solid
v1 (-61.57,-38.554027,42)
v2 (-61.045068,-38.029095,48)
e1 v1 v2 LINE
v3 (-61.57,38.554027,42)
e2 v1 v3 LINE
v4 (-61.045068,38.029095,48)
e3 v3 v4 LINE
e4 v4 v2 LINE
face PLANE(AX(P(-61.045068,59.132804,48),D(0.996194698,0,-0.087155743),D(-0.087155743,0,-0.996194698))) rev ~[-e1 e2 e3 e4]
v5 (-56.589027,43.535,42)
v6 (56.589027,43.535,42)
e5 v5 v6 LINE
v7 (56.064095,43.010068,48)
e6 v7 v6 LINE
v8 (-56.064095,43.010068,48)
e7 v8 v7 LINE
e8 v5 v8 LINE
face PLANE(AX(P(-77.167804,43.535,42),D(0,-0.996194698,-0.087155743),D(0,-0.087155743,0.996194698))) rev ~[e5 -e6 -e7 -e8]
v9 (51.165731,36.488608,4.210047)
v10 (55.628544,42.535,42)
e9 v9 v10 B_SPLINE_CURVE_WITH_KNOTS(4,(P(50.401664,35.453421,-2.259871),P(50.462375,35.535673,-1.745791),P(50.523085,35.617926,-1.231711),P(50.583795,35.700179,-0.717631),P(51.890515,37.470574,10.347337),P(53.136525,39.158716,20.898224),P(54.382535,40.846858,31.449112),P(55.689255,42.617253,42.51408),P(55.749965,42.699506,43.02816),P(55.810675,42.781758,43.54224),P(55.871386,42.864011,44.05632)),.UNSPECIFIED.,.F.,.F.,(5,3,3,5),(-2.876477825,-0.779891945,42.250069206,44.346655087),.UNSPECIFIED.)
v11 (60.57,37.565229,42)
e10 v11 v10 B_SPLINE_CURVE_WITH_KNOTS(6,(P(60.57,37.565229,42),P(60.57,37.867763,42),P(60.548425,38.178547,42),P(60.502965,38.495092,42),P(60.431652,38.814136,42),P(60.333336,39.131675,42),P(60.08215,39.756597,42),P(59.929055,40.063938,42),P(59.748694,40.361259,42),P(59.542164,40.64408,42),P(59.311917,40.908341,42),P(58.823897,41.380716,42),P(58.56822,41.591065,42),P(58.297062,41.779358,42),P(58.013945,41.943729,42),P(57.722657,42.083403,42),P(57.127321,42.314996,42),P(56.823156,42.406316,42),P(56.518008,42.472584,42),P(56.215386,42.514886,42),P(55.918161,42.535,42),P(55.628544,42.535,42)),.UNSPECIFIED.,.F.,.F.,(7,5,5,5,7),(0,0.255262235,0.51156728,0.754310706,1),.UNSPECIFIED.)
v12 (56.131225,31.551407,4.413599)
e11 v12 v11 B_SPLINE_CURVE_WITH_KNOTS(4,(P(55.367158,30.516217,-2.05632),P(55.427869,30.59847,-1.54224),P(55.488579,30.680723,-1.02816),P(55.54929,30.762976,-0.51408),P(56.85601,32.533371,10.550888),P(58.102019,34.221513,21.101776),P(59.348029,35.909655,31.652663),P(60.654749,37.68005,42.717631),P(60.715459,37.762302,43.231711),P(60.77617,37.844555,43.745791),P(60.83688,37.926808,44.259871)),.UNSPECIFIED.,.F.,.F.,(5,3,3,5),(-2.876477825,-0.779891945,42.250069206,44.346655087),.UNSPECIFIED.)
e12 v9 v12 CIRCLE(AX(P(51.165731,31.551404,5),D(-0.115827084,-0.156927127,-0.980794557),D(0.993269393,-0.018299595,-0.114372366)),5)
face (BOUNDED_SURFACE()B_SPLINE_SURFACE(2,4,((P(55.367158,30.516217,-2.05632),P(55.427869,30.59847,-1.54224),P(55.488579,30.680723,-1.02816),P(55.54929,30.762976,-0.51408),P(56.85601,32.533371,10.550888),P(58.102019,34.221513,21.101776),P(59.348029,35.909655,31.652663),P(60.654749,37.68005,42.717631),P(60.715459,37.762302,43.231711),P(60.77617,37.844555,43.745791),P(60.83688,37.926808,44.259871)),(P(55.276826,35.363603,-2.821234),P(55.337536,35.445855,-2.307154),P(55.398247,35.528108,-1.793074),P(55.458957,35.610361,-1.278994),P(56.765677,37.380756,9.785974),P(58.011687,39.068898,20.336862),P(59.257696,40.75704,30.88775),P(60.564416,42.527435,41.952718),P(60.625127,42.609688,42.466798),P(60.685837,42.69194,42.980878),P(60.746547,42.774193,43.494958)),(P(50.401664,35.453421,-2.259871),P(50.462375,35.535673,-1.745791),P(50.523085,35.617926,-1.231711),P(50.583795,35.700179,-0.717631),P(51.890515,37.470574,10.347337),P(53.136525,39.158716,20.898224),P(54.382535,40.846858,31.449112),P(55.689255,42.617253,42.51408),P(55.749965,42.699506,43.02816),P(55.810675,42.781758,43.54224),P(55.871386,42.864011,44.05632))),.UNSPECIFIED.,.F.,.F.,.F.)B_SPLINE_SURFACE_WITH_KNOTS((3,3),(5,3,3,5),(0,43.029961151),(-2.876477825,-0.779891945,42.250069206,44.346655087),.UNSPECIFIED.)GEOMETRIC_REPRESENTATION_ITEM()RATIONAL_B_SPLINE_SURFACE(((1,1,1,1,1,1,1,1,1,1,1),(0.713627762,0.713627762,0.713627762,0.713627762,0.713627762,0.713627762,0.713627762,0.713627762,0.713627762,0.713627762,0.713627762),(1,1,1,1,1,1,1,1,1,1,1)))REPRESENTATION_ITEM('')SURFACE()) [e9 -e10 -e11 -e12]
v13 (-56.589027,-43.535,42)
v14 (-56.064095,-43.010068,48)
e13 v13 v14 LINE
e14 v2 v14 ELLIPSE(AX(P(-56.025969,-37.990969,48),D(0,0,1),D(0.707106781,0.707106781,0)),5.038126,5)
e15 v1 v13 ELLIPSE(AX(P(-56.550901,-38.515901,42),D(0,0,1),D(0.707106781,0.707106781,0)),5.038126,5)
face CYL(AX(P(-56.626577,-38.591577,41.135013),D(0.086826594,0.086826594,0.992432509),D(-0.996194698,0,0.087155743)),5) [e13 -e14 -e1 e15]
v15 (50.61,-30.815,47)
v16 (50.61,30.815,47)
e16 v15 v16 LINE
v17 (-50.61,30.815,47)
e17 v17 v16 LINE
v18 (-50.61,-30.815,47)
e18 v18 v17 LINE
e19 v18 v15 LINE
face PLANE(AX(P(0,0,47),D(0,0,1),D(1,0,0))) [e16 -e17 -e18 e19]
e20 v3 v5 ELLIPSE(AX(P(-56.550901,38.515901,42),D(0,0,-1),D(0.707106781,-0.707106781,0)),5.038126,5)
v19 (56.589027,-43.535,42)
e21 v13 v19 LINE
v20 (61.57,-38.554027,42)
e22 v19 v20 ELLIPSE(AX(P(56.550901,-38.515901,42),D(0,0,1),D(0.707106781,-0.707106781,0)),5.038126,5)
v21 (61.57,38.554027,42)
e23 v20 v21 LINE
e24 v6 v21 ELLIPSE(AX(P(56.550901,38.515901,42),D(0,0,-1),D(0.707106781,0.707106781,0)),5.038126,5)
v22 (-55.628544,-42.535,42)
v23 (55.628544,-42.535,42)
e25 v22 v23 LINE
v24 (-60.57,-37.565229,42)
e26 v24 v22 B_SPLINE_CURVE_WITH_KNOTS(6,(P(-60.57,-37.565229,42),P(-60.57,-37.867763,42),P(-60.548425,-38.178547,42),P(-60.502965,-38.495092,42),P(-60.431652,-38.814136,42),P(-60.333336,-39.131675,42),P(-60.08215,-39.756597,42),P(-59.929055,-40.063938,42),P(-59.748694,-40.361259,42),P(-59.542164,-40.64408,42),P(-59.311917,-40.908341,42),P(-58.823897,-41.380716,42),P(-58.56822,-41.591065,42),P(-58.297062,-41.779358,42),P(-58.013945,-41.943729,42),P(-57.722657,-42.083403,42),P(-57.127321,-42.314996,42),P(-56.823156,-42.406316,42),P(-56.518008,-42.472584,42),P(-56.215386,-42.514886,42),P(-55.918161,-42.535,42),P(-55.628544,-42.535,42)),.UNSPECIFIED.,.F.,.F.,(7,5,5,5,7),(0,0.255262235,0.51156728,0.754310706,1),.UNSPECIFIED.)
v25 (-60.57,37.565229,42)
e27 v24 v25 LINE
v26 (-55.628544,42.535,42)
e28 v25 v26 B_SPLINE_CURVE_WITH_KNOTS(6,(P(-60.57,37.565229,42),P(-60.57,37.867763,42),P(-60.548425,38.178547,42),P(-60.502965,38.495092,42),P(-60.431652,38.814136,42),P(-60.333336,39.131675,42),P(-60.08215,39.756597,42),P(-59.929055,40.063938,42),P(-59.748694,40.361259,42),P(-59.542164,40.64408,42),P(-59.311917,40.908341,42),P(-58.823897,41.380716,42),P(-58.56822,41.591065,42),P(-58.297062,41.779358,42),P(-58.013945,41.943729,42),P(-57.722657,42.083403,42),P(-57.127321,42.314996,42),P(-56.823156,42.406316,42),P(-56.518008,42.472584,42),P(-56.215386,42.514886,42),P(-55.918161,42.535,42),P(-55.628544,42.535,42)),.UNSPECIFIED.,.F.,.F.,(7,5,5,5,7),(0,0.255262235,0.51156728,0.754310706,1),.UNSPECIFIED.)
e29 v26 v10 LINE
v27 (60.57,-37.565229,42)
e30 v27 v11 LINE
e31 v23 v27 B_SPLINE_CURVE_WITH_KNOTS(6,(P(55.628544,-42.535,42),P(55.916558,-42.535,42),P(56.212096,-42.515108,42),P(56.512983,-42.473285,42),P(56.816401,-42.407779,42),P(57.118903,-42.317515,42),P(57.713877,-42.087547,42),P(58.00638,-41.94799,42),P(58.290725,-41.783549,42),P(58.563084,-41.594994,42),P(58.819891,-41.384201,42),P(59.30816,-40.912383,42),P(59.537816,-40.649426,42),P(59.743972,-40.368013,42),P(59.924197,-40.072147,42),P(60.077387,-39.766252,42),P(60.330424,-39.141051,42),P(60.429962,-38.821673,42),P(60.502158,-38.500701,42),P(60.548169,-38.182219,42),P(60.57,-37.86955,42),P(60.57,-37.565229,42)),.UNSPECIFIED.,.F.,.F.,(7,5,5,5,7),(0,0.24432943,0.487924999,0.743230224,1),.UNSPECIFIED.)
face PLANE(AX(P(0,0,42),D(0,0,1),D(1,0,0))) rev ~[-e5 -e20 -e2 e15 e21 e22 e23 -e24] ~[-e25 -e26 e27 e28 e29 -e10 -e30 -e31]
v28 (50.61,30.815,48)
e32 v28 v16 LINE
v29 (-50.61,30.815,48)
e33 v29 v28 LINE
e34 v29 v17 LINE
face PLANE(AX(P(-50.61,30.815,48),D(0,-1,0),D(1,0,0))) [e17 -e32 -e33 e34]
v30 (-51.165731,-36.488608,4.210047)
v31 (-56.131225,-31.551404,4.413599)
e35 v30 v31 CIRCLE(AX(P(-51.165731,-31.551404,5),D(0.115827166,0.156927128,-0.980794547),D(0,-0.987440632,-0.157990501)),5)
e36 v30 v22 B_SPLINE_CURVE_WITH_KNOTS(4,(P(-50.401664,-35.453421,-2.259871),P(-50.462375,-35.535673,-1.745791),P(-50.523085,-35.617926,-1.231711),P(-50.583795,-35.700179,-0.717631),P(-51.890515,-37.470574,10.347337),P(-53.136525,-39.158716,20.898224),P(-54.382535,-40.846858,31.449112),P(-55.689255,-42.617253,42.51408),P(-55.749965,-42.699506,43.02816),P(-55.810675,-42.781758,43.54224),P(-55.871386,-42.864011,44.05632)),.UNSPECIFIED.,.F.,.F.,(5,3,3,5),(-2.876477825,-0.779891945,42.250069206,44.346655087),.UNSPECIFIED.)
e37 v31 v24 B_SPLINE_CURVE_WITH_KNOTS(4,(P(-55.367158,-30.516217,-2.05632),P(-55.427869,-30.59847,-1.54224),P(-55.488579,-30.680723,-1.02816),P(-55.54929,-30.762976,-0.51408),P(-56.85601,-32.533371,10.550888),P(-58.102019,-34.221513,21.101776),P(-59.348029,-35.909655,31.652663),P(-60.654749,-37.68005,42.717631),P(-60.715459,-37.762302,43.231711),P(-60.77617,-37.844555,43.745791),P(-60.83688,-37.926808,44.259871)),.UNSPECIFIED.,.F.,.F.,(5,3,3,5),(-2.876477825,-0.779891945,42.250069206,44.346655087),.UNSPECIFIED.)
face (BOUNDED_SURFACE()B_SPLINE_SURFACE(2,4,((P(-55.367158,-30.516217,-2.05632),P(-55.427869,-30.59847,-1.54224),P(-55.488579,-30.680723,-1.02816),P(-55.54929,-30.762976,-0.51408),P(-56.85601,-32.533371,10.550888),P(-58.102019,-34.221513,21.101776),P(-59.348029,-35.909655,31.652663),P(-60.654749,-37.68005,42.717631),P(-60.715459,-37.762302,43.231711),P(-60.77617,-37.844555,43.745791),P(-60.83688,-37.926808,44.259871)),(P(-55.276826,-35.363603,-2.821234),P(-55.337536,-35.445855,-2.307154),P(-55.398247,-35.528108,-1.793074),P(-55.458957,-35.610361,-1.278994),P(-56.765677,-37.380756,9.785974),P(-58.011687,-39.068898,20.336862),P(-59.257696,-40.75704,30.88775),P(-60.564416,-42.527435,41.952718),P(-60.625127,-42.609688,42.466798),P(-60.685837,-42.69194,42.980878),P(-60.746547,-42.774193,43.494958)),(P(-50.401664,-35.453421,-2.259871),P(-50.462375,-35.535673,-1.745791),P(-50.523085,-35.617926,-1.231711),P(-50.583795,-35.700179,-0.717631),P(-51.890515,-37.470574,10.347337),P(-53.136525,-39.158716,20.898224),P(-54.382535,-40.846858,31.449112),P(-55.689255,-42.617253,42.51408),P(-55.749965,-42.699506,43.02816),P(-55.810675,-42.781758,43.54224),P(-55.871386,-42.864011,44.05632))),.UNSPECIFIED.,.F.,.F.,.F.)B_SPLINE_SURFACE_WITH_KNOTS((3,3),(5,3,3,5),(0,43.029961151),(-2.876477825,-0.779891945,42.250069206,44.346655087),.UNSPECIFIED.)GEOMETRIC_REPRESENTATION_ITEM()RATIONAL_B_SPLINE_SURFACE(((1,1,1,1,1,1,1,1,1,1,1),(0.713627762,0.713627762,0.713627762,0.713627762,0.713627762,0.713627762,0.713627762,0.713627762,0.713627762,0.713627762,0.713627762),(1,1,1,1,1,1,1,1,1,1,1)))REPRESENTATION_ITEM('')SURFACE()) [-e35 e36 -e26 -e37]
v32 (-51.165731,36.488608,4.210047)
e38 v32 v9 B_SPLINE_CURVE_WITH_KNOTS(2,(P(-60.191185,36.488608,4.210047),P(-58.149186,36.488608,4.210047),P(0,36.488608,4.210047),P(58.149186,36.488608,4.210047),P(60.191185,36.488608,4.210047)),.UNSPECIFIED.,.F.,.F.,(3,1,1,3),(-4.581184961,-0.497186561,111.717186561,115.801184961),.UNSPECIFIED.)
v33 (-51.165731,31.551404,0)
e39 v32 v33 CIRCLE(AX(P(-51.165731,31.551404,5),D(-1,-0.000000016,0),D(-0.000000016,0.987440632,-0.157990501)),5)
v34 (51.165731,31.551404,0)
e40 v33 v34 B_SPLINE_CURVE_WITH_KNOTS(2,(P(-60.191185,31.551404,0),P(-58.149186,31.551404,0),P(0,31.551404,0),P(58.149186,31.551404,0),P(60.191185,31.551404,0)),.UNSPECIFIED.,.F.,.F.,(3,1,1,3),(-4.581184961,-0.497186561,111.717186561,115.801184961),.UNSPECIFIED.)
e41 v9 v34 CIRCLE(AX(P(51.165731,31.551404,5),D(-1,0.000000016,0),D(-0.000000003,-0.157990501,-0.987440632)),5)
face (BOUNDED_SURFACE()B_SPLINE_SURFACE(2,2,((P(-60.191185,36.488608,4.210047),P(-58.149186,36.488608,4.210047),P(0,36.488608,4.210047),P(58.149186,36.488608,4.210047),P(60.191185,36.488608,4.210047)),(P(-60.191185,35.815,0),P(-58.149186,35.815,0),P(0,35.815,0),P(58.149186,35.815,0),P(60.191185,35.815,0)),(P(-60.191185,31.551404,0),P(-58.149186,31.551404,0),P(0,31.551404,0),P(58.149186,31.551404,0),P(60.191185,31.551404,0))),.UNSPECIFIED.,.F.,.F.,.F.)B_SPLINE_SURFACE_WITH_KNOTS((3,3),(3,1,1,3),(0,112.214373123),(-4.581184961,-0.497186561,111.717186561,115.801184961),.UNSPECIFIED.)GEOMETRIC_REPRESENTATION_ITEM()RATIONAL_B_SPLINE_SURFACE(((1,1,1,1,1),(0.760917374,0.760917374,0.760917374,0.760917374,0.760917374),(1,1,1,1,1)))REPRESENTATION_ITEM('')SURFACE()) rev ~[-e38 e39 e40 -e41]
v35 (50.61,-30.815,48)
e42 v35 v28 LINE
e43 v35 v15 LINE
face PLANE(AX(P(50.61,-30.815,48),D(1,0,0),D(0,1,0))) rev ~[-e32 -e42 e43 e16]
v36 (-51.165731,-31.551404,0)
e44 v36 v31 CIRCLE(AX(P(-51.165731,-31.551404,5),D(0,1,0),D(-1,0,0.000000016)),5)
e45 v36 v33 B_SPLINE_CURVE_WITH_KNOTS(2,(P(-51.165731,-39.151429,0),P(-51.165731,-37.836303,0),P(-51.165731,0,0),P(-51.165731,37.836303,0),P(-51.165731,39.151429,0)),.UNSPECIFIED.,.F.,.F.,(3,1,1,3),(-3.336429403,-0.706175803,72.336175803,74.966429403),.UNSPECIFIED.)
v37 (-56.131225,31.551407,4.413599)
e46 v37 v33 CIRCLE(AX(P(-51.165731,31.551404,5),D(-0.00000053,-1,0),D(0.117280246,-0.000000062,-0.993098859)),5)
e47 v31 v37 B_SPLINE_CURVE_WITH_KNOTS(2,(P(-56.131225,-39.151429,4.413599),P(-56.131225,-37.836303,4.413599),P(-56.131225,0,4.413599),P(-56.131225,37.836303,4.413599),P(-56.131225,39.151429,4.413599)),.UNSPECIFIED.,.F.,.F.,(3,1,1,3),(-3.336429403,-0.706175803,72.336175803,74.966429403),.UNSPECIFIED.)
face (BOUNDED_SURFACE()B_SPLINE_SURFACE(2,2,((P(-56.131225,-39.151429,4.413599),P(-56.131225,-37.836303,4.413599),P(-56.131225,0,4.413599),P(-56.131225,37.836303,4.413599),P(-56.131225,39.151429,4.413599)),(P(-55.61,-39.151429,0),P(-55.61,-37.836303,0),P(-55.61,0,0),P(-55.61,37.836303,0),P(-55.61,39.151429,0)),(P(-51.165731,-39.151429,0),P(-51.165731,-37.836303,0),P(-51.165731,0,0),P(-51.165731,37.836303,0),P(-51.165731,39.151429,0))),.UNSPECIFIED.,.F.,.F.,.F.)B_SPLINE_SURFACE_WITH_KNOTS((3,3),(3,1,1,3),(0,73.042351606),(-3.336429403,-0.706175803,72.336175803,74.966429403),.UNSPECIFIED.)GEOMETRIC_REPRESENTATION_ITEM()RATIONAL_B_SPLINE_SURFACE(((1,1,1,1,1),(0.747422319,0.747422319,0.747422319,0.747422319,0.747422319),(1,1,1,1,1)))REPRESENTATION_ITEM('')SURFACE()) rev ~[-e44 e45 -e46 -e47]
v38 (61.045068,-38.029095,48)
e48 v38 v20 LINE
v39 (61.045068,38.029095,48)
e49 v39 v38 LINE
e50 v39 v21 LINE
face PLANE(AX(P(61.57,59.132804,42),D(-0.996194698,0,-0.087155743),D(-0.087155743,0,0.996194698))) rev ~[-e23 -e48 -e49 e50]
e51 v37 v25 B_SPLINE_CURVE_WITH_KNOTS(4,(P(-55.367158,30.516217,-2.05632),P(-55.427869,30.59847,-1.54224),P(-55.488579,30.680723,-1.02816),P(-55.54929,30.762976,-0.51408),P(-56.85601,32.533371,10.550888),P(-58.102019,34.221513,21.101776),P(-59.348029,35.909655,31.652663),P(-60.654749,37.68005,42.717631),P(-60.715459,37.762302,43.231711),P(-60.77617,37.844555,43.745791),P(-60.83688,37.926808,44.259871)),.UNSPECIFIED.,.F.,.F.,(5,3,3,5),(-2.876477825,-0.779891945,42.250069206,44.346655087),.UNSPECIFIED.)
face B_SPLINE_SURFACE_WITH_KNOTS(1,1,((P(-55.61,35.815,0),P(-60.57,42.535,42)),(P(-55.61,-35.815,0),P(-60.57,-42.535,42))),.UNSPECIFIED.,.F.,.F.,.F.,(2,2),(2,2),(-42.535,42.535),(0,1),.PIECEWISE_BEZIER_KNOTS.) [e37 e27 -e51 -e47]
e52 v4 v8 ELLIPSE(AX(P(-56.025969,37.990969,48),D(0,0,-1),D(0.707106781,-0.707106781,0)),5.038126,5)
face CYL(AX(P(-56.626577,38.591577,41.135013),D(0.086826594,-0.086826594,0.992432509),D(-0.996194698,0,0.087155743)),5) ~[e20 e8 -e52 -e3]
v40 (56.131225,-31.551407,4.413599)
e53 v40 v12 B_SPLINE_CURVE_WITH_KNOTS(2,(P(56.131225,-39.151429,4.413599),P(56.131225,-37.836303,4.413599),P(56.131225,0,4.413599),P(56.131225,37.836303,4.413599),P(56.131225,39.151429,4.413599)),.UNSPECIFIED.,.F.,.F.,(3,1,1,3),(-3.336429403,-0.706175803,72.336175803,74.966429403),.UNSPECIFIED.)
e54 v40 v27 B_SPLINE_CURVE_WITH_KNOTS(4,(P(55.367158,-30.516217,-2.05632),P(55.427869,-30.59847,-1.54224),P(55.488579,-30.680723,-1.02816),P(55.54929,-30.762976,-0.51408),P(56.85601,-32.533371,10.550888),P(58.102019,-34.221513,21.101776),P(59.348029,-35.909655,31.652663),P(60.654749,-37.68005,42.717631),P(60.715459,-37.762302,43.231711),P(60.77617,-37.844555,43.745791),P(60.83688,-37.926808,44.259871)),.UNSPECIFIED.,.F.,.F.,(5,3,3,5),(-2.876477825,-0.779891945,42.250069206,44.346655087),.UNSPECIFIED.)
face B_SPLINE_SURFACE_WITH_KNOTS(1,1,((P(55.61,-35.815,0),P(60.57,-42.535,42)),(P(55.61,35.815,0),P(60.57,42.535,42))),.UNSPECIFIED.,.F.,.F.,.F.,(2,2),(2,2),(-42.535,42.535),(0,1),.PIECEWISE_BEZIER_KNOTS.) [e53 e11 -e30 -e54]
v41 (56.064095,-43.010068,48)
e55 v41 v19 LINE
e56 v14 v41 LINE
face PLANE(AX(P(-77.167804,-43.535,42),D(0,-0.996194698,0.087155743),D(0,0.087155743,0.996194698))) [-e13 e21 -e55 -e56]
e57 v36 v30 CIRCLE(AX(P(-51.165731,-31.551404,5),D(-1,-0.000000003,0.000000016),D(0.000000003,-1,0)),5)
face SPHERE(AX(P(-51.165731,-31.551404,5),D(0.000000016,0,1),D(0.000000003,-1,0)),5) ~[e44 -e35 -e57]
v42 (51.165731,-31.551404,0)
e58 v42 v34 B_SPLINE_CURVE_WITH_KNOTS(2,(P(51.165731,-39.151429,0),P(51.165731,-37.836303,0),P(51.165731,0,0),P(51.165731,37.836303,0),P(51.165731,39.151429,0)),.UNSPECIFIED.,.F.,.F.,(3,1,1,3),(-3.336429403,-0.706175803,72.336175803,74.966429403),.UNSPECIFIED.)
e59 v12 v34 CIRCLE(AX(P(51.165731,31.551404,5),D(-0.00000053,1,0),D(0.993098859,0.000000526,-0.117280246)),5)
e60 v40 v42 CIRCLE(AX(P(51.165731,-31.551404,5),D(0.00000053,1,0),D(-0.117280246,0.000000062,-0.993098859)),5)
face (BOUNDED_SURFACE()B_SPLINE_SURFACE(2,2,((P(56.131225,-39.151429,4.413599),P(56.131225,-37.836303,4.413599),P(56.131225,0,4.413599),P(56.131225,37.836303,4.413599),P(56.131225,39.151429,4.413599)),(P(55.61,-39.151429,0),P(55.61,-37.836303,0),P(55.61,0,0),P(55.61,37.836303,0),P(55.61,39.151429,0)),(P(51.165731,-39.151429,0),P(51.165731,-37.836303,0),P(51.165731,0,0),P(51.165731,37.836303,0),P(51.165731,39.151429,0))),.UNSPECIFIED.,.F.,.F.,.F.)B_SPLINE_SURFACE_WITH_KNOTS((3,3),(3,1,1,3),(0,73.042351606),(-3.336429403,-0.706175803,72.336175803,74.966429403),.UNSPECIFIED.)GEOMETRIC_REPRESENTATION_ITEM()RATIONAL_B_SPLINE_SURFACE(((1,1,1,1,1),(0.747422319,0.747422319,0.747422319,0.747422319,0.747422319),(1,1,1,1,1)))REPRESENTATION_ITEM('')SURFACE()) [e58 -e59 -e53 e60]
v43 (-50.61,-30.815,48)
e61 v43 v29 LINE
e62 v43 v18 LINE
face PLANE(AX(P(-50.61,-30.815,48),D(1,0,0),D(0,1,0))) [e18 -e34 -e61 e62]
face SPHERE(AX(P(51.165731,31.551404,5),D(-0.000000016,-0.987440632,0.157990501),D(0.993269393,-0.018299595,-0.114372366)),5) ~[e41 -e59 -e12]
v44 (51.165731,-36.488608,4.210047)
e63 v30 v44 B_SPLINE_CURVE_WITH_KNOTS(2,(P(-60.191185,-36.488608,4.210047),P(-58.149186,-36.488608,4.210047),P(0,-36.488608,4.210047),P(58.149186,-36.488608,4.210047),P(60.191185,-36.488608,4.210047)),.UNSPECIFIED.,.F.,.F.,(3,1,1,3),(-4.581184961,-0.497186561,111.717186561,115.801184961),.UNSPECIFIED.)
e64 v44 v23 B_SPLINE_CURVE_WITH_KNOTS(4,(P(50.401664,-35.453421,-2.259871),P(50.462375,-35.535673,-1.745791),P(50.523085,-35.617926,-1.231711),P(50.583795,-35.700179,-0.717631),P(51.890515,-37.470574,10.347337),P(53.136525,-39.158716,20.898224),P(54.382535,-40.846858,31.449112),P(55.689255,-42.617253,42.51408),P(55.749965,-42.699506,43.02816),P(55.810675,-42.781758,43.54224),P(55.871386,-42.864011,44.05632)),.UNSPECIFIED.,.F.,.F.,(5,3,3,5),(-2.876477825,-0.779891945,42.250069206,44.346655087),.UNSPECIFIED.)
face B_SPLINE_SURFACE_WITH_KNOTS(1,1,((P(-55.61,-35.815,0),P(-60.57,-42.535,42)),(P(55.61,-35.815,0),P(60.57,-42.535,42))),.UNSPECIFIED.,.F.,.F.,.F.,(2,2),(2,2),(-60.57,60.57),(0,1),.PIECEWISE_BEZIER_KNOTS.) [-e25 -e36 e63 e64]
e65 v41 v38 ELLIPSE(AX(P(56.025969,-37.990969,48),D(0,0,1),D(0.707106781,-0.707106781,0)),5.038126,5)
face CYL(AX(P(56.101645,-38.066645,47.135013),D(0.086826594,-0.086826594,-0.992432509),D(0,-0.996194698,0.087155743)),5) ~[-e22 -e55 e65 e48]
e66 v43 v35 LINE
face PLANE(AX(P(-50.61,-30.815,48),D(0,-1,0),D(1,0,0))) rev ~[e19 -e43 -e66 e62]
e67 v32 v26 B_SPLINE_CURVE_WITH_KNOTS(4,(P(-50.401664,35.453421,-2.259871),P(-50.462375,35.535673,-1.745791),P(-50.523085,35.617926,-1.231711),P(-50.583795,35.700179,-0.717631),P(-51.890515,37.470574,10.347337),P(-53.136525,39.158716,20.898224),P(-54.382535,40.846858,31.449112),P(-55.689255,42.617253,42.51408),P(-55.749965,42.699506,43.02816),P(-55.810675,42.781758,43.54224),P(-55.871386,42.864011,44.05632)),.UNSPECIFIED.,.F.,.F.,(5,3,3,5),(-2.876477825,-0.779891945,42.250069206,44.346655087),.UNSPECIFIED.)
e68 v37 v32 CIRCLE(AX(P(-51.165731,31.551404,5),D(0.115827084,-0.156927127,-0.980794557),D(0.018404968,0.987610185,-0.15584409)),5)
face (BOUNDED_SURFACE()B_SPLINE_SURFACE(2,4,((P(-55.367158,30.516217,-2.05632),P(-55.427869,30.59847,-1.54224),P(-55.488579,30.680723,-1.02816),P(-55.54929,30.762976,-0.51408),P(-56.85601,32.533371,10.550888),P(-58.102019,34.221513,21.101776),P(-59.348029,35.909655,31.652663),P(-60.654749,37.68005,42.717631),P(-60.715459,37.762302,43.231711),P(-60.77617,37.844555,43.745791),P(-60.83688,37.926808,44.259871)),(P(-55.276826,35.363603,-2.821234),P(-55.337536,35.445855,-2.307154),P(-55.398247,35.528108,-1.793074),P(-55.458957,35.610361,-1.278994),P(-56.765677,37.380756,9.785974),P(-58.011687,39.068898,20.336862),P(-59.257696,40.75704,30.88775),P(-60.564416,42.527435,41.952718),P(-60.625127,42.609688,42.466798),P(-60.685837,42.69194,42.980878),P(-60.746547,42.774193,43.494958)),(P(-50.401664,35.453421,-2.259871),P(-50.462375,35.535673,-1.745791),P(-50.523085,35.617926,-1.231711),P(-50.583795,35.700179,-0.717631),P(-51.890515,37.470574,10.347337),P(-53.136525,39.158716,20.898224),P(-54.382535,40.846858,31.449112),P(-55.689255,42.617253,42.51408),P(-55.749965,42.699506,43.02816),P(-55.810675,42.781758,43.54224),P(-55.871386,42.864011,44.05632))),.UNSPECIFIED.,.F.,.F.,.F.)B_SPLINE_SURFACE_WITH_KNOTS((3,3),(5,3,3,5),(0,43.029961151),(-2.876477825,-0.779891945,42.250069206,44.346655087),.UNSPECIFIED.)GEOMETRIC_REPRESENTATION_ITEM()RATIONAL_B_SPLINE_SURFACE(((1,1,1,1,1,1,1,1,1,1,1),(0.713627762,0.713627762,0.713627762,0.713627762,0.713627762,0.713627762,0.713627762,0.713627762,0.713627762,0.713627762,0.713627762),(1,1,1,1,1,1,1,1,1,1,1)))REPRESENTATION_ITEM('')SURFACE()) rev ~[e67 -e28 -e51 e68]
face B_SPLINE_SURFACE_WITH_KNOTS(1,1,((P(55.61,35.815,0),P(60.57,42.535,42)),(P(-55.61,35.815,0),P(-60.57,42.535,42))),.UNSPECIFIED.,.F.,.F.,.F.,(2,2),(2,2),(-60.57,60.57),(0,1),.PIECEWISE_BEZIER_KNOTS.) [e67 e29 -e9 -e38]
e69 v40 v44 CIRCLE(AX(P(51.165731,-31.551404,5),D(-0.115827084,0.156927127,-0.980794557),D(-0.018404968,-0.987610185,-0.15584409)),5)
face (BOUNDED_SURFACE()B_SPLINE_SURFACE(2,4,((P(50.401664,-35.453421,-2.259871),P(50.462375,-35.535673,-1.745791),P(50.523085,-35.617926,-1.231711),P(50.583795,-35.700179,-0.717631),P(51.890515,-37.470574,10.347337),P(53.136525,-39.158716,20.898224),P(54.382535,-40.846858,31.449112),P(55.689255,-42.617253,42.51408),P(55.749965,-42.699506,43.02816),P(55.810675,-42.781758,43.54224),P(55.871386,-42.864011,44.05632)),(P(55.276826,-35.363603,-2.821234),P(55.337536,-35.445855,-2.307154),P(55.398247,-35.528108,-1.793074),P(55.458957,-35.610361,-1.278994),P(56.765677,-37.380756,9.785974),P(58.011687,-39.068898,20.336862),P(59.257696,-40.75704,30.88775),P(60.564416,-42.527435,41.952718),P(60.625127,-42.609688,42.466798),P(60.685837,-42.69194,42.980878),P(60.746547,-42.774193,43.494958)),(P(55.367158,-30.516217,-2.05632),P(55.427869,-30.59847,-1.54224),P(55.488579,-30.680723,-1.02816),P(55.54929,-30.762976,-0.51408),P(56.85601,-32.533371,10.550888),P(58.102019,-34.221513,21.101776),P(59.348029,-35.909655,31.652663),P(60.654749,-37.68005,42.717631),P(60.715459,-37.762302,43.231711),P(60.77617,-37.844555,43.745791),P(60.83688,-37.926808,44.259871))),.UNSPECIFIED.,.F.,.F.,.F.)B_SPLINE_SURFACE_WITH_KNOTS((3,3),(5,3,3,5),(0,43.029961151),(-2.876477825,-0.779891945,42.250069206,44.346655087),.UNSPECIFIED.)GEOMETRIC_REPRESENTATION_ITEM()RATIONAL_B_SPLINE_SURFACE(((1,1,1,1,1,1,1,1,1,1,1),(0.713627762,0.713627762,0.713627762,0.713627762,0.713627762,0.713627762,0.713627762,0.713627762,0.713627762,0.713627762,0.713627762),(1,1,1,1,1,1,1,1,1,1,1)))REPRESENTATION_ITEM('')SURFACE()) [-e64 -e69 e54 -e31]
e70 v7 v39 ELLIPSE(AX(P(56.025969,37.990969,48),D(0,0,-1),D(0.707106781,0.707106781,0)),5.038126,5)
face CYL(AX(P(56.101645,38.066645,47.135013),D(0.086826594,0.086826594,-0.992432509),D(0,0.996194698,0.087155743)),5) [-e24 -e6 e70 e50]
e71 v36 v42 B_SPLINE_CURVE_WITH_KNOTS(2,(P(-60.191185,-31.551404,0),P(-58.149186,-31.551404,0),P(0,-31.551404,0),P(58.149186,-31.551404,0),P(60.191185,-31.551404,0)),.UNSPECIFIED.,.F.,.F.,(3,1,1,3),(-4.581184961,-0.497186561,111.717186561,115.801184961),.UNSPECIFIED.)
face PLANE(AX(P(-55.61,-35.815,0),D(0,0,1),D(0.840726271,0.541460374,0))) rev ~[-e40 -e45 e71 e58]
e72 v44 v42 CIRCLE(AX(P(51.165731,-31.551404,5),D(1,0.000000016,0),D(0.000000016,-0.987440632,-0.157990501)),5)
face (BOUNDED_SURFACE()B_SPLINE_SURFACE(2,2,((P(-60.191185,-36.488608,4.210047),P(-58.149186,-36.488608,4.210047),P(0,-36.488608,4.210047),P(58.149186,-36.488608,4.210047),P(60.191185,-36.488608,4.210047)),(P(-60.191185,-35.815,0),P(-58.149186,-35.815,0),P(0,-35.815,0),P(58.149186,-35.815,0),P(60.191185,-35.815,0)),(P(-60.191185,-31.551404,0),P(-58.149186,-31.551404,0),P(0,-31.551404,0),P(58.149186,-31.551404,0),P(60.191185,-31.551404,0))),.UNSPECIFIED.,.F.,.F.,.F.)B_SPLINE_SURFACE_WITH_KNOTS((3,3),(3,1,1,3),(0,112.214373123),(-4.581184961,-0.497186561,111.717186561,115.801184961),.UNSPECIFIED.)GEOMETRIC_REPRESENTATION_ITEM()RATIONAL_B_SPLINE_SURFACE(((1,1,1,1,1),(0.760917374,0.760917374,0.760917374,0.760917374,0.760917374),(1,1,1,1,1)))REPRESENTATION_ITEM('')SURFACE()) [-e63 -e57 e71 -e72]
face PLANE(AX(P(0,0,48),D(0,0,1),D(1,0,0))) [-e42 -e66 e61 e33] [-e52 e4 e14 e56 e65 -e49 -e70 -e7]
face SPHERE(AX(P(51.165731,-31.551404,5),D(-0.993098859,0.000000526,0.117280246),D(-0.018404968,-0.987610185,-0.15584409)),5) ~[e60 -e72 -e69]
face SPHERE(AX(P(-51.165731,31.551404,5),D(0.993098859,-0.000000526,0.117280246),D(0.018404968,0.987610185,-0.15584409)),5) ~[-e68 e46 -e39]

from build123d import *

# Parameters (mm, degrees)
F0_W        = 111.22
F0_H        = 71.63
F2_W        = 121.14
F2_H        = 85.07
F4_R        = 5
F6_W        = 123.14
F6_H        = 87.07
F7_DEPTH    = 6
F8_T1_DEPTH = 154.335608958
F8_T3_DEPTH = 118.265608958
F10_W       = 101.22
F10_H       = 61.63
F11_DEPTH   = 1
F12_R       = 5


# Not quite as in the source:
# - a fillet or chamfer that OpenCascade refuses, or shapes differently, is made with other operations: its cross-section is extruded or revolved along the edge and cut away or added


with BuildPart() as f3:
    # F0 (on Top) → F3 section 0
    with BuildSketch(Plane.XY):
        Rectangle(F0_W, F0_H)
    # F2 (on offset) → F3 section 1
    with BuildSketch(Plane.XY.offset(42)):
        Rectangle(F2_W, F2_H)
    loft()

    # F4
    f4_edges = [f3.edges().sort_by_distance(p)[0] for p in [
        (-58.09, -39.175, 21),
        (0, -35.815, 0),
        (58.09, -39.175, 21),
        (55.61, 0, 0),
        (58.09, 39.175, 21),
        (0, 35.815, 0),
        (-58.09, 39.175, 21),
        (-55.61, 0, 0),
    ]]
    fillet(f4_edges, radius=F4_R)

    # F6 (on offset) → F7 (join)
    with BuildSketch(Plane.XY.offset(42)):
        Rectangle(F6_W, F6_H)
    extrude(amount=F7_DEPTH)

    # F8: chamfer of 6 x 0.5249319812 on 4 edges, made by hand

    # F8_s2 → F8_t1 (cut)
    with BuildSketch(Plane.YZ.offset(-77.167804479)):
        Polygon((-43.535, 42), (-43.0100680188, 48), (-43.535, 48), align=None)
        Polygon((43.535, 42), (43.0100680188, 48), (43.535, 48), align=None)
    extrude(amount=F8_T1_DEPTH, mode=Mode.SUBTRACT)

    # F8_s4 → F8_t3 (cut)
    with BuildSketch(Plane.XZ.offset(-59.132804479)):
        Polygon((-61.0450680188, 48), (-61.57, 42), (-61.57, 48), align=None)
        Polygon((61.57, 42), (61.0450680188, 48), (61.57, 48), align=None)
    extrude(amount=F8_T3_DEPTH, mode=Mode.SUBTRACT)

    # F10 (on offset) → F11 (cut)
    with BuildSketch(Plane.XY.offset(48)):
        Rectangle(F10_W, F10_H)
    extrude(amount=-F11_DEPTH, mode=Mode.SUBTRACT)

    # F12
    f12_edges = [f3.edges().sort_by_distance(p)[0] for p in [
        (-61.307534, -43.272534, 45),
        (61.307534, -43.272534, 45),
        (61.307534, 43.272534, 45),
        (-61.307534, 43.272534, 45),
    ]]
    fillet(f12_edges, radius=F12_R)


solid = f3.part
